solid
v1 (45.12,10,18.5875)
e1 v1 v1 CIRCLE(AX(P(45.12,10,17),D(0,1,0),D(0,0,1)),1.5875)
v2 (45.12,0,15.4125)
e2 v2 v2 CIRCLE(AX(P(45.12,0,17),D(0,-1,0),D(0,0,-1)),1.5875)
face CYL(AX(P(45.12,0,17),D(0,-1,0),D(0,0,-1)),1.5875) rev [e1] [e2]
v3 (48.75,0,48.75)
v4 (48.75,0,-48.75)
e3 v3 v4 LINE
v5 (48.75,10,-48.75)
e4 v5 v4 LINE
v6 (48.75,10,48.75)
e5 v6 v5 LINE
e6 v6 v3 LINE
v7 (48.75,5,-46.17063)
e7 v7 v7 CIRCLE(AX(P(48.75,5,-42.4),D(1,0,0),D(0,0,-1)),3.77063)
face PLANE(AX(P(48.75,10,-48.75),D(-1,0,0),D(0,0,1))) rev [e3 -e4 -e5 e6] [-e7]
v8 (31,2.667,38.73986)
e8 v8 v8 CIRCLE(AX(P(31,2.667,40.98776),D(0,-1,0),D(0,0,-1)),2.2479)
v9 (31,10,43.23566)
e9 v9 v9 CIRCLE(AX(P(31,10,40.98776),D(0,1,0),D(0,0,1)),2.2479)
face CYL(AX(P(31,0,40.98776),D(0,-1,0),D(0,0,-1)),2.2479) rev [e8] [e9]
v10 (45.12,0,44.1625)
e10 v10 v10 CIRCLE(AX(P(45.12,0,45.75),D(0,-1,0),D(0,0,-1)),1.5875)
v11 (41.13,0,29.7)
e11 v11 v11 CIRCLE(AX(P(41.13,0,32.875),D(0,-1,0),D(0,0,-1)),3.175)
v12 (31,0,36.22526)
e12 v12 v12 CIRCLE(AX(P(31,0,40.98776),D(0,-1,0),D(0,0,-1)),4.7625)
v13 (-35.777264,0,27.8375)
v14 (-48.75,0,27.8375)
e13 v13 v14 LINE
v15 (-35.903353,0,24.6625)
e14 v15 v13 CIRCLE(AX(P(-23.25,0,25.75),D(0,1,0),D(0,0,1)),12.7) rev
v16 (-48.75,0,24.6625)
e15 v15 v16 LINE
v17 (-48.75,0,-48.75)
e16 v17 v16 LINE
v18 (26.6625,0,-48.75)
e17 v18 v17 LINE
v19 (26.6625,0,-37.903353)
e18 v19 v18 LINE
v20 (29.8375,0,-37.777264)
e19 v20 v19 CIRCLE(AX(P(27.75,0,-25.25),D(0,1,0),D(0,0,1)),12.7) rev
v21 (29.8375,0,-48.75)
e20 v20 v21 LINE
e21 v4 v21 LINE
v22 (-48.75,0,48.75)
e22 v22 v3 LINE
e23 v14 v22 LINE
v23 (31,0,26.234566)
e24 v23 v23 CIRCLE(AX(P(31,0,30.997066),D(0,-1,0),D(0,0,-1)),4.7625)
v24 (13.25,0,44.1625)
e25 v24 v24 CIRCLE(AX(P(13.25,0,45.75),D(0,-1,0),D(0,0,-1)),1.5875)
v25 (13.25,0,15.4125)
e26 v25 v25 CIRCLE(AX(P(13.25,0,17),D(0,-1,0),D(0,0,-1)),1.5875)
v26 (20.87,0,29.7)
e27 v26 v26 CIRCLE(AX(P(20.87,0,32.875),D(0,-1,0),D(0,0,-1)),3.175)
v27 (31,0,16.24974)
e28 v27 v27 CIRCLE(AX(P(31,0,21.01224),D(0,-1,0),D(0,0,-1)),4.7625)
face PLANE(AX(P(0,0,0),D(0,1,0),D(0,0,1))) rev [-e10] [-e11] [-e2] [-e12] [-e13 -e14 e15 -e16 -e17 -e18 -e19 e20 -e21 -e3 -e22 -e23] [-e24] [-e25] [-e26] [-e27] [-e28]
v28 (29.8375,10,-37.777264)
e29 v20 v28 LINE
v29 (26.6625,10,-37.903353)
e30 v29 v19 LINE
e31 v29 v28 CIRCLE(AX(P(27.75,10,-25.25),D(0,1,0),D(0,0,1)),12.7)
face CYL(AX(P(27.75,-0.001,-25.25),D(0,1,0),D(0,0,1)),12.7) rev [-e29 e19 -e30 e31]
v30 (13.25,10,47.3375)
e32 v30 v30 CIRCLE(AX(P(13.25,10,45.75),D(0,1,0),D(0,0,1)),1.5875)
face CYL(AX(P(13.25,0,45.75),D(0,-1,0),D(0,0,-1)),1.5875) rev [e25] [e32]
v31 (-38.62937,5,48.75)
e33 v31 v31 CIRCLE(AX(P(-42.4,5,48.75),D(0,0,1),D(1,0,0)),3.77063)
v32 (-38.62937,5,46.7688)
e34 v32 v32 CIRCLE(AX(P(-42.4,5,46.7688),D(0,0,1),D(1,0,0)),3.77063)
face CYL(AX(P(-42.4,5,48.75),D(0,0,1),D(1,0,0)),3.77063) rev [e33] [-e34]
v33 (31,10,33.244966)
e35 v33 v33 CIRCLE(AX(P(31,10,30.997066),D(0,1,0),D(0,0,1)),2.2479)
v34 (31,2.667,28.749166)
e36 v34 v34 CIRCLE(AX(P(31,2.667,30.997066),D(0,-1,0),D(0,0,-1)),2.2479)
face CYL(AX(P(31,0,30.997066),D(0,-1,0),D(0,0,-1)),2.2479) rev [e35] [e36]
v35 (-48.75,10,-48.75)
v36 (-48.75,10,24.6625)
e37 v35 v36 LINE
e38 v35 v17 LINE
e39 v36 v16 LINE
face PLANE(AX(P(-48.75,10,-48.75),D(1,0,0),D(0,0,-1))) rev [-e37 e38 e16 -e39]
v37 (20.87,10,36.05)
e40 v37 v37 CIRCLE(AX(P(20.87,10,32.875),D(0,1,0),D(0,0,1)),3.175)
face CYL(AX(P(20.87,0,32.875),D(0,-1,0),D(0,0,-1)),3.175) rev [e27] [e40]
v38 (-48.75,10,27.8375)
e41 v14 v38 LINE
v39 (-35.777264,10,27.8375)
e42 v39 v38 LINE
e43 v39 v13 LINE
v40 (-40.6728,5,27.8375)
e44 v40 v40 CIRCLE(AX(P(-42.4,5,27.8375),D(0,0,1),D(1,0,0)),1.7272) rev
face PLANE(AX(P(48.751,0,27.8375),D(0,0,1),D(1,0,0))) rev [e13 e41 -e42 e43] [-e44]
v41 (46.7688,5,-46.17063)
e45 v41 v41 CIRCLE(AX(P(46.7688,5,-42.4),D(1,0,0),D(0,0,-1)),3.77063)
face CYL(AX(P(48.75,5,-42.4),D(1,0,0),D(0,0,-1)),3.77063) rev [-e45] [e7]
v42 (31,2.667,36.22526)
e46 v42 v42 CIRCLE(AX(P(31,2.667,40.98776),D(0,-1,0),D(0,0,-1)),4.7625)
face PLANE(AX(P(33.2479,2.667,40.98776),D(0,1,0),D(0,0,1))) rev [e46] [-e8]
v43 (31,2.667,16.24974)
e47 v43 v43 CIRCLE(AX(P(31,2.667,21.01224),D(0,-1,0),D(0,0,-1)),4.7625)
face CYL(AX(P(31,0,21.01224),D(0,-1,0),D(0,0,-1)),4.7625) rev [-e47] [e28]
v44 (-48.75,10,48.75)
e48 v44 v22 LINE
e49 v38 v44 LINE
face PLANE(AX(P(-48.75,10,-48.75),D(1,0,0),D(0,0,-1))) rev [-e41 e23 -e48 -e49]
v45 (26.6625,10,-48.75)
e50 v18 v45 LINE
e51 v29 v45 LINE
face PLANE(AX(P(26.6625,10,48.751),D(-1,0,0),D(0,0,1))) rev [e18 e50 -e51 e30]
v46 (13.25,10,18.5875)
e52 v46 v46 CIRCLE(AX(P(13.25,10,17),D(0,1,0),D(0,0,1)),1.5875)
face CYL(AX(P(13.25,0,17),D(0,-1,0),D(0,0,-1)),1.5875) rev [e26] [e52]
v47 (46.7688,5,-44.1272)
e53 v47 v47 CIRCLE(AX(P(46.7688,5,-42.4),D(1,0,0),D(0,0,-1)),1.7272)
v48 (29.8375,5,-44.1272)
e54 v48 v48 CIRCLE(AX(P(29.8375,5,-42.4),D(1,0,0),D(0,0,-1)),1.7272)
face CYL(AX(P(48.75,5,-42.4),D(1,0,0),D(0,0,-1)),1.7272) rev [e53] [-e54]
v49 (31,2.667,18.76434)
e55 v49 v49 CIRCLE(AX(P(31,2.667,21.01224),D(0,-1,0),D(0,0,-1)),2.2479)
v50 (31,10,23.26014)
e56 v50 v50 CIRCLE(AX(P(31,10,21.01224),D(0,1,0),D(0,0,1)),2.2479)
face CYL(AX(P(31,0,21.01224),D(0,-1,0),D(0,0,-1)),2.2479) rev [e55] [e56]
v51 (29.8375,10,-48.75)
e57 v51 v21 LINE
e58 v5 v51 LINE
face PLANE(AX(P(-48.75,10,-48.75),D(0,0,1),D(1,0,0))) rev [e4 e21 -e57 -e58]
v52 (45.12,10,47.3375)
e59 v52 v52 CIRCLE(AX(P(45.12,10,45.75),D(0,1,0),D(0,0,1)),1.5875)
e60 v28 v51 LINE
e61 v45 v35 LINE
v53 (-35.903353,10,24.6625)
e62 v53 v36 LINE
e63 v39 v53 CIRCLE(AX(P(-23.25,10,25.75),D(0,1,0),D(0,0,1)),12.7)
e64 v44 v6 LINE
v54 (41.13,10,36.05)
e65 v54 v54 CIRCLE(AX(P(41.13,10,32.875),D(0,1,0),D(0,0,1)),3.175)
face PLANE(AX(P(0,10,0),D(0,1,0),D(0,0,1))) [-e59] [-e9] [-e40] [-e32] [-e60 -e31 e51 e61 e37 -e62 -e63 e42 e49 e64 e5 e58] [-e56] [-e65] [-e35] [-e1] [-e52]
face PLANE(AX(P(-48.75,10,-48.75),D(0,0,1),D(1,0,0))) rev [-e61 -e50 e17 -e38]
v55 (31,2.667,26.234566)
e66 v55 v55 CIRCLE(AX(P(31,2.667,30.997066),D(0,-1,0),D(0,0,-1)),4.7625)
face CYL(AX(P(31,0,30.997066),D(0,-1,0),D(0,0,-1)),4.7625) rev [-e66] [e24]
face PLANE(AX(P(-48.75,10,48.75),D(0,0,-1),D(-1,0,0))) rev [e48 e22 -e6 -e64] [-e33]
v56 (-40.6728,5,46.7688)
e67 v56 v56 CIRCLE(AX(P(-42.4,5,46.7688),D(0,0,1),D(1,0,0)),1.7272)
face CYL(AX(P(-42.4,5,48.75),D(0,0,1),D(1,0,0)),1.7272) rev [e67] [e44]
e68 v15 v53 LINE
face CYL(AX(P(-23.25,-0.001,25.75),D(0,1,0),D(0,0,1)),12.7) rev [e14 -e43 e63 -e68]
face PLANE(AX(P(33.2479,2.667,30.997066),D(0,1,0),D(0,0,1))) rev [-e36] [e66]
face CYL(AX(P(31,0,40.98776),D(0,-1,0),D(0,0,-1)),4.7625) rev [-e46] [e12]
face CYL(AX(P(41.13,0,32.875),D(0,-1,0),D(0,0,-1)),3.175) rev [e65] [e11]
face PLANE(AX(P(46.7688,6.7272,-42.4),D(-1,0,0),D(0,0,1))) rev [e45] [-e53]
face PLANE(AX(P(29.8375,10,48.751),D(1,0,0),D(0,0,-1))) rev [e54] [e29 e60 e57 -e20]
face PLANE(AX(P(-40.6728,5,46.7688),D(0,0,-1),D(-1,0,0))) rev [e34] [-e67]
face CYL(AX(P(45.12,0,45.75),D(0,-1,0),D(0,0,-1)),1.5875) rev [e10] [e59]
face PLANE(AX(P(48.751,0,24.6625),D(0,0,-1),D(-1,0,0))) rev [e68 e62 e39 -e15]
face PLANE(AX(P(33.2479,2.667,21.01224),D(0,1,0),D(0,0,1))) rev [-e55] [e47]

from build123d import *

# Parameters (mm, degrees)
SKETCH1_W                                           = 97.5
SKETCH1_H                                           = 97.5
BOSS_EXTRUDE1_DEPTH                                 = 10
CUT_EXTRUDE4_REACH                                  = 71.664
SKETCH14_R                                          = 12.7
CUT_EXTRUDE5_REACH                                  = 111.466
CUT_EXTRUDE5_END_RADIUS                             = 12.7
SKETCH15_W                                          = 3.175
SKETCH15_H                                          = 10
CUT_EXTRUDE6_REACH                                  = 111.466
CUT_EXTRUDE6_END_RADIUS                             = 12.7
SKETCH16_W                                          = 3.175
SKETCH16_H                                          = 10
CBORE_START                                         = 27.8375
CBORE_FOR_5_BINDING_HEAD_MACHINE_SC_2_R             = 1.7272
CBORE_FOR_5_BINDING_HEAD_MACHINE_SCREW2_DEPTH       = 20.9125
CBORE_START_2                                       = 46.7688
CBORE_FOR_5_BINDING_HEAD_MACHINE_SC_3_O_R           = 3.77063
CBORE_FOR_5_BINDING_HEAD_MACHINE_SC_3_O_R_2         = 1.7272
CBORE_FOR_5_BINDING_HEAD_MACHINE_SC_3_DEPTH         = 1.9812
CBORE_FOR_5_BINDING_HEAD_MACHINE_SCREW3_D           = 3.4544
CBORE_FOR_5_BINDING_HEAD_MACHINE_SCREW3_DEPTH       = 22.0865
CBORE_FOR_5_BINDING_HEAD_MACHINE_SCREW3_CBORE_D     = 7.54126
CBORE_FOR_5_BINDING_HEAD_MACHINE_SCREW3_CBORE_DEPTH = 1.9812
F_1_8_0_125_DIAMETER_HOLE2_D                        = 3.175
CBORE_FOR_8_BINDING_HEAD_MACHINE_SCREW1_D           = 4.4958
CBORE_FOR_8_BINDING_HEAD_MACHINE_SCREW1_CBORE_D     = 9.525
CBORE_FOR_8_BINDING_HEAD_MACHINE_SCREW1_CBORE_DEPTH = 2.667
F_1_4_0_25_DIAMETER_HOLE2_D                         = 6.35


# Read off the part's stored shape, not the designer's step: CBORE for #5 Binding Head Machine Screw2
with BuildPart() as part:
    # Sketch1 → Boss-Extrude1 (new body)
    with BuildSketch(Plane(origin=(0, 0, 0), x_dir=(1, 0, 0), z_dir=(0, 1, 0))):
        Rectangle(SKETCH1_W, SKETCH1_H)
    extrude(amount=BOSS_EXTRUDE1_DEPTH)

    # Sketch14 → Cut-Extrude4 (cut, up to next)
    with BuildSketch(Plane(origin=(0, 10, 0), x_dir=(1, 0, 0), z_dir=(0, 1, 0)), mode=Mode.PRIVATE) as cut_extrude4_sk1:
        with Locations(Location((-23.25, -25.75, 0), (0, 0, 270))):
            Circle(SKETCH14_R)
    cut_extrude4_tool1 = extrude(cut_extrude4_sk1.sketch, amount=-CUT_EXTRUDE4_REACH, mode=Mode.PRIVATE) & part.part
    # Sketch14 → Cut-Extrude4 (cut, up to next)
    with BuildSketch(Plane(origin=(0, 10, 0), x_dir=(1, 0, 0), z_dir=(0, 1, 0)), mode=Mode.PRIVATE) as cut_extrude4_sk2:
        with Locations(Location((27.75, 25.25, 0), (0, 0, 270))):
            Circle(SKETCH14_R)
    cut_extrude4_tool2 = extrude(cut_extrude4_sk2.sketch, amount=-CUT_EXTRUDE4_REACH, mode=Mode.PRIVATE) & part.part
    add(cut_extrude4_tool1.solids().sort_by_distance((-23.25, 10, 25.75))[0], mode=Mode.SUBTRACT)
    add(cut_extrude4_tool2.solids().sort_by_distance((27.75, 10, -25.25))[0], mode=Mode.SUBTRACT)

    # Cut-Extrude5: up to this cylinder (the profile starts outside it)
    cut_extrude5_end = Plane(origin=(-23.25, 5, 25.75), z_dir=(0, 1, 0)) * Cylinder(CUT_EXTRUDE5_END_RADIUS, 249.332, mode=Mode.PRIVATE)
    # Sketch15 → Cut-Extrude5 (cut, up to the surface)
    with BuildSketch(Plane.ZY.offset(48.75), mode=Mode.PRIVATE) as cut_extrude5_sk1:
        with Locations((26.25, 5)):
            Rectangle(SKETCH15_W, SKETCH15_H)
    cut_extrude5_tool1 = extrude(cut_extrude5_sk1.sketch, amount=-CUT_EXTRUDE5_REACH, mode=Mode.PRIVATE) - cut_extrude5_end
    add(cut_extrude5_tool1.solids().sort_by_distance((-48.75, 5, 26.25))[0], mode=Mode.SUBTRACT)

    # Cut-Extrude6: up to this cylinder (the profile starts outside it)
    cut_extrude6_end = Plane(origin=(27.75, 5, -25.25), z_dir=(0, 1, 0)) * Cylinder(CUT_EXTRUDE6_END_RADIUS, 249.332, mode=Mode.PRIVATE)
    # Sketch16 → Cut-Extrude6 (cut, up to the surface)
    with BuildSketch(Plane(origin=(0, 0, -48.75), x_dir=(-1, 0, 0), z_dir=(0, 0, -1)), mode=Mode.PRIVATE) as cut_extrude6_sk1:
        with Locations((-28.25, 5)):
            Rectangle(SKETCH16_W, SKETCH16_H)
    cut_extrude6_tool1 = extrude(cut_extrude6_sk1.sketch, amount=-CUT_EXTRUDE6_REACH, mode=Mode.PRIVATE) - cut_extrude6_end
    add(cut_extrude6_tool1.solids().sort_by_distance((28.25, 5, -48.75))[0], mode=Mode.SUBTRACT)

    # CBORE for _5 Binding Head Machine Sc 2 → CBORE for #5 Binding Head Machine Screw2 (cut)
    with BuildSketch(Plane.XY.offset(CBORE_START)):
        with Locations((-42.4, 5)):
            Circle(CBORE_FOR_5_BINDING_HEAD_MACHINE_SC_2_R)
    extrude(amount=CBORE_FOR_5_BINDING_HEAD_MACHINE_SCREW2_DEPTH, mode=Mode.SUBTRACT)

    # CBORE for _5 Binding Head Machine Sc 3 o → CBORE for _5 Binding Head Machine Sc 3 (cut)
    with BuildSketch(Plane.XY.offset(CBORE_START_2)):
        with Locations((-42.4, 5)):
            Circle(CBORE_FOR_5_BINDING_HEAD_MACHINE_SC_3_O_R)
        with Locations((-42.4, 5)):
            Circle(CBORE_FOR_5_BINDING_HEAD_MACHINE_SC_3_O_R_2, mode=Mode.SUBTRACT)
    extrude(amount=CBORE_FOR_5_BINDING_HEAD_MACHINE_SC_3_DEPTH, mode=Mode.SUBTRACT)

    # CBORE for #5 Binding Head Machine Screw3
    with Locations(Plane(origin=(48.75, 0, 0), x_dir=(0, 0, -1), z_dir=(1, 0, 0))):
        with Locations((42.4, 5)):
            CounterBoreHole(CBORE_FOR_5_BINDING_HEAD_MACHINE_SCREW3_D / 2, CBORE_FOR_5_BINDING_HEAD_MACHINE_SCREW3_CBORE_D / 2, CBORE_FOR_5_BINDING_HEAD_MACHINE_SCREW3_CBORE_DEPTH, depth=CBORE_FOR_5_BINDING_HEAD_MACHINE_SCREW3_DEPTH)

    # 1/8 (0.125) Diameter Hole2 (through all)
    with Locations(Plane(origin=(0, 0, 0), x_dir=(-1, 0, 0), z_dir=(0, -1, 0))):
        with Locations((-13.25, -45.75), (-45.12, -45.75), (-13.25, -17), (-45.12, -17)):
            Hole(F_1_8_0_125_DIAMETER_HOLE2_D / 2)

    # CBORE for #8 Binding Head Machine Screw1 (through all)
    with Locations(Plane(origin=(0, 0, 0), x_dir=(-1, 0, 0), z_dir=(0, -1, 0))):
        with Locations((-31, -40.98776), (-31, -21.01224), (-31, -30.997066185)):
            CounterBoreHole(CBORE_FOR_8_BINDING_HEAD_MACHINE_SCREW1_D / 2, CBORE_FOR_8_BINDING_HEAD_MACHINE_SCREW1_CBORE_D / 2, CBORE_FOR_8_BINDING_HEAD_MACHINE_SCREW1_CBORE_DEPTH)

    # 1/4 (0.25) Diameter Hole2 (through all)
    with Locations(Plane(origin=(0, 0, 0), x_dir=(-1, 0, 0), z_dir=(0, -1, 0))):
        with Locations((-20.87, -32.875), (-41.13, -32.875)):
            Hole(F_1_4_0_25_DIAMETER_HOLE2_D / 2)


solid = part.part
